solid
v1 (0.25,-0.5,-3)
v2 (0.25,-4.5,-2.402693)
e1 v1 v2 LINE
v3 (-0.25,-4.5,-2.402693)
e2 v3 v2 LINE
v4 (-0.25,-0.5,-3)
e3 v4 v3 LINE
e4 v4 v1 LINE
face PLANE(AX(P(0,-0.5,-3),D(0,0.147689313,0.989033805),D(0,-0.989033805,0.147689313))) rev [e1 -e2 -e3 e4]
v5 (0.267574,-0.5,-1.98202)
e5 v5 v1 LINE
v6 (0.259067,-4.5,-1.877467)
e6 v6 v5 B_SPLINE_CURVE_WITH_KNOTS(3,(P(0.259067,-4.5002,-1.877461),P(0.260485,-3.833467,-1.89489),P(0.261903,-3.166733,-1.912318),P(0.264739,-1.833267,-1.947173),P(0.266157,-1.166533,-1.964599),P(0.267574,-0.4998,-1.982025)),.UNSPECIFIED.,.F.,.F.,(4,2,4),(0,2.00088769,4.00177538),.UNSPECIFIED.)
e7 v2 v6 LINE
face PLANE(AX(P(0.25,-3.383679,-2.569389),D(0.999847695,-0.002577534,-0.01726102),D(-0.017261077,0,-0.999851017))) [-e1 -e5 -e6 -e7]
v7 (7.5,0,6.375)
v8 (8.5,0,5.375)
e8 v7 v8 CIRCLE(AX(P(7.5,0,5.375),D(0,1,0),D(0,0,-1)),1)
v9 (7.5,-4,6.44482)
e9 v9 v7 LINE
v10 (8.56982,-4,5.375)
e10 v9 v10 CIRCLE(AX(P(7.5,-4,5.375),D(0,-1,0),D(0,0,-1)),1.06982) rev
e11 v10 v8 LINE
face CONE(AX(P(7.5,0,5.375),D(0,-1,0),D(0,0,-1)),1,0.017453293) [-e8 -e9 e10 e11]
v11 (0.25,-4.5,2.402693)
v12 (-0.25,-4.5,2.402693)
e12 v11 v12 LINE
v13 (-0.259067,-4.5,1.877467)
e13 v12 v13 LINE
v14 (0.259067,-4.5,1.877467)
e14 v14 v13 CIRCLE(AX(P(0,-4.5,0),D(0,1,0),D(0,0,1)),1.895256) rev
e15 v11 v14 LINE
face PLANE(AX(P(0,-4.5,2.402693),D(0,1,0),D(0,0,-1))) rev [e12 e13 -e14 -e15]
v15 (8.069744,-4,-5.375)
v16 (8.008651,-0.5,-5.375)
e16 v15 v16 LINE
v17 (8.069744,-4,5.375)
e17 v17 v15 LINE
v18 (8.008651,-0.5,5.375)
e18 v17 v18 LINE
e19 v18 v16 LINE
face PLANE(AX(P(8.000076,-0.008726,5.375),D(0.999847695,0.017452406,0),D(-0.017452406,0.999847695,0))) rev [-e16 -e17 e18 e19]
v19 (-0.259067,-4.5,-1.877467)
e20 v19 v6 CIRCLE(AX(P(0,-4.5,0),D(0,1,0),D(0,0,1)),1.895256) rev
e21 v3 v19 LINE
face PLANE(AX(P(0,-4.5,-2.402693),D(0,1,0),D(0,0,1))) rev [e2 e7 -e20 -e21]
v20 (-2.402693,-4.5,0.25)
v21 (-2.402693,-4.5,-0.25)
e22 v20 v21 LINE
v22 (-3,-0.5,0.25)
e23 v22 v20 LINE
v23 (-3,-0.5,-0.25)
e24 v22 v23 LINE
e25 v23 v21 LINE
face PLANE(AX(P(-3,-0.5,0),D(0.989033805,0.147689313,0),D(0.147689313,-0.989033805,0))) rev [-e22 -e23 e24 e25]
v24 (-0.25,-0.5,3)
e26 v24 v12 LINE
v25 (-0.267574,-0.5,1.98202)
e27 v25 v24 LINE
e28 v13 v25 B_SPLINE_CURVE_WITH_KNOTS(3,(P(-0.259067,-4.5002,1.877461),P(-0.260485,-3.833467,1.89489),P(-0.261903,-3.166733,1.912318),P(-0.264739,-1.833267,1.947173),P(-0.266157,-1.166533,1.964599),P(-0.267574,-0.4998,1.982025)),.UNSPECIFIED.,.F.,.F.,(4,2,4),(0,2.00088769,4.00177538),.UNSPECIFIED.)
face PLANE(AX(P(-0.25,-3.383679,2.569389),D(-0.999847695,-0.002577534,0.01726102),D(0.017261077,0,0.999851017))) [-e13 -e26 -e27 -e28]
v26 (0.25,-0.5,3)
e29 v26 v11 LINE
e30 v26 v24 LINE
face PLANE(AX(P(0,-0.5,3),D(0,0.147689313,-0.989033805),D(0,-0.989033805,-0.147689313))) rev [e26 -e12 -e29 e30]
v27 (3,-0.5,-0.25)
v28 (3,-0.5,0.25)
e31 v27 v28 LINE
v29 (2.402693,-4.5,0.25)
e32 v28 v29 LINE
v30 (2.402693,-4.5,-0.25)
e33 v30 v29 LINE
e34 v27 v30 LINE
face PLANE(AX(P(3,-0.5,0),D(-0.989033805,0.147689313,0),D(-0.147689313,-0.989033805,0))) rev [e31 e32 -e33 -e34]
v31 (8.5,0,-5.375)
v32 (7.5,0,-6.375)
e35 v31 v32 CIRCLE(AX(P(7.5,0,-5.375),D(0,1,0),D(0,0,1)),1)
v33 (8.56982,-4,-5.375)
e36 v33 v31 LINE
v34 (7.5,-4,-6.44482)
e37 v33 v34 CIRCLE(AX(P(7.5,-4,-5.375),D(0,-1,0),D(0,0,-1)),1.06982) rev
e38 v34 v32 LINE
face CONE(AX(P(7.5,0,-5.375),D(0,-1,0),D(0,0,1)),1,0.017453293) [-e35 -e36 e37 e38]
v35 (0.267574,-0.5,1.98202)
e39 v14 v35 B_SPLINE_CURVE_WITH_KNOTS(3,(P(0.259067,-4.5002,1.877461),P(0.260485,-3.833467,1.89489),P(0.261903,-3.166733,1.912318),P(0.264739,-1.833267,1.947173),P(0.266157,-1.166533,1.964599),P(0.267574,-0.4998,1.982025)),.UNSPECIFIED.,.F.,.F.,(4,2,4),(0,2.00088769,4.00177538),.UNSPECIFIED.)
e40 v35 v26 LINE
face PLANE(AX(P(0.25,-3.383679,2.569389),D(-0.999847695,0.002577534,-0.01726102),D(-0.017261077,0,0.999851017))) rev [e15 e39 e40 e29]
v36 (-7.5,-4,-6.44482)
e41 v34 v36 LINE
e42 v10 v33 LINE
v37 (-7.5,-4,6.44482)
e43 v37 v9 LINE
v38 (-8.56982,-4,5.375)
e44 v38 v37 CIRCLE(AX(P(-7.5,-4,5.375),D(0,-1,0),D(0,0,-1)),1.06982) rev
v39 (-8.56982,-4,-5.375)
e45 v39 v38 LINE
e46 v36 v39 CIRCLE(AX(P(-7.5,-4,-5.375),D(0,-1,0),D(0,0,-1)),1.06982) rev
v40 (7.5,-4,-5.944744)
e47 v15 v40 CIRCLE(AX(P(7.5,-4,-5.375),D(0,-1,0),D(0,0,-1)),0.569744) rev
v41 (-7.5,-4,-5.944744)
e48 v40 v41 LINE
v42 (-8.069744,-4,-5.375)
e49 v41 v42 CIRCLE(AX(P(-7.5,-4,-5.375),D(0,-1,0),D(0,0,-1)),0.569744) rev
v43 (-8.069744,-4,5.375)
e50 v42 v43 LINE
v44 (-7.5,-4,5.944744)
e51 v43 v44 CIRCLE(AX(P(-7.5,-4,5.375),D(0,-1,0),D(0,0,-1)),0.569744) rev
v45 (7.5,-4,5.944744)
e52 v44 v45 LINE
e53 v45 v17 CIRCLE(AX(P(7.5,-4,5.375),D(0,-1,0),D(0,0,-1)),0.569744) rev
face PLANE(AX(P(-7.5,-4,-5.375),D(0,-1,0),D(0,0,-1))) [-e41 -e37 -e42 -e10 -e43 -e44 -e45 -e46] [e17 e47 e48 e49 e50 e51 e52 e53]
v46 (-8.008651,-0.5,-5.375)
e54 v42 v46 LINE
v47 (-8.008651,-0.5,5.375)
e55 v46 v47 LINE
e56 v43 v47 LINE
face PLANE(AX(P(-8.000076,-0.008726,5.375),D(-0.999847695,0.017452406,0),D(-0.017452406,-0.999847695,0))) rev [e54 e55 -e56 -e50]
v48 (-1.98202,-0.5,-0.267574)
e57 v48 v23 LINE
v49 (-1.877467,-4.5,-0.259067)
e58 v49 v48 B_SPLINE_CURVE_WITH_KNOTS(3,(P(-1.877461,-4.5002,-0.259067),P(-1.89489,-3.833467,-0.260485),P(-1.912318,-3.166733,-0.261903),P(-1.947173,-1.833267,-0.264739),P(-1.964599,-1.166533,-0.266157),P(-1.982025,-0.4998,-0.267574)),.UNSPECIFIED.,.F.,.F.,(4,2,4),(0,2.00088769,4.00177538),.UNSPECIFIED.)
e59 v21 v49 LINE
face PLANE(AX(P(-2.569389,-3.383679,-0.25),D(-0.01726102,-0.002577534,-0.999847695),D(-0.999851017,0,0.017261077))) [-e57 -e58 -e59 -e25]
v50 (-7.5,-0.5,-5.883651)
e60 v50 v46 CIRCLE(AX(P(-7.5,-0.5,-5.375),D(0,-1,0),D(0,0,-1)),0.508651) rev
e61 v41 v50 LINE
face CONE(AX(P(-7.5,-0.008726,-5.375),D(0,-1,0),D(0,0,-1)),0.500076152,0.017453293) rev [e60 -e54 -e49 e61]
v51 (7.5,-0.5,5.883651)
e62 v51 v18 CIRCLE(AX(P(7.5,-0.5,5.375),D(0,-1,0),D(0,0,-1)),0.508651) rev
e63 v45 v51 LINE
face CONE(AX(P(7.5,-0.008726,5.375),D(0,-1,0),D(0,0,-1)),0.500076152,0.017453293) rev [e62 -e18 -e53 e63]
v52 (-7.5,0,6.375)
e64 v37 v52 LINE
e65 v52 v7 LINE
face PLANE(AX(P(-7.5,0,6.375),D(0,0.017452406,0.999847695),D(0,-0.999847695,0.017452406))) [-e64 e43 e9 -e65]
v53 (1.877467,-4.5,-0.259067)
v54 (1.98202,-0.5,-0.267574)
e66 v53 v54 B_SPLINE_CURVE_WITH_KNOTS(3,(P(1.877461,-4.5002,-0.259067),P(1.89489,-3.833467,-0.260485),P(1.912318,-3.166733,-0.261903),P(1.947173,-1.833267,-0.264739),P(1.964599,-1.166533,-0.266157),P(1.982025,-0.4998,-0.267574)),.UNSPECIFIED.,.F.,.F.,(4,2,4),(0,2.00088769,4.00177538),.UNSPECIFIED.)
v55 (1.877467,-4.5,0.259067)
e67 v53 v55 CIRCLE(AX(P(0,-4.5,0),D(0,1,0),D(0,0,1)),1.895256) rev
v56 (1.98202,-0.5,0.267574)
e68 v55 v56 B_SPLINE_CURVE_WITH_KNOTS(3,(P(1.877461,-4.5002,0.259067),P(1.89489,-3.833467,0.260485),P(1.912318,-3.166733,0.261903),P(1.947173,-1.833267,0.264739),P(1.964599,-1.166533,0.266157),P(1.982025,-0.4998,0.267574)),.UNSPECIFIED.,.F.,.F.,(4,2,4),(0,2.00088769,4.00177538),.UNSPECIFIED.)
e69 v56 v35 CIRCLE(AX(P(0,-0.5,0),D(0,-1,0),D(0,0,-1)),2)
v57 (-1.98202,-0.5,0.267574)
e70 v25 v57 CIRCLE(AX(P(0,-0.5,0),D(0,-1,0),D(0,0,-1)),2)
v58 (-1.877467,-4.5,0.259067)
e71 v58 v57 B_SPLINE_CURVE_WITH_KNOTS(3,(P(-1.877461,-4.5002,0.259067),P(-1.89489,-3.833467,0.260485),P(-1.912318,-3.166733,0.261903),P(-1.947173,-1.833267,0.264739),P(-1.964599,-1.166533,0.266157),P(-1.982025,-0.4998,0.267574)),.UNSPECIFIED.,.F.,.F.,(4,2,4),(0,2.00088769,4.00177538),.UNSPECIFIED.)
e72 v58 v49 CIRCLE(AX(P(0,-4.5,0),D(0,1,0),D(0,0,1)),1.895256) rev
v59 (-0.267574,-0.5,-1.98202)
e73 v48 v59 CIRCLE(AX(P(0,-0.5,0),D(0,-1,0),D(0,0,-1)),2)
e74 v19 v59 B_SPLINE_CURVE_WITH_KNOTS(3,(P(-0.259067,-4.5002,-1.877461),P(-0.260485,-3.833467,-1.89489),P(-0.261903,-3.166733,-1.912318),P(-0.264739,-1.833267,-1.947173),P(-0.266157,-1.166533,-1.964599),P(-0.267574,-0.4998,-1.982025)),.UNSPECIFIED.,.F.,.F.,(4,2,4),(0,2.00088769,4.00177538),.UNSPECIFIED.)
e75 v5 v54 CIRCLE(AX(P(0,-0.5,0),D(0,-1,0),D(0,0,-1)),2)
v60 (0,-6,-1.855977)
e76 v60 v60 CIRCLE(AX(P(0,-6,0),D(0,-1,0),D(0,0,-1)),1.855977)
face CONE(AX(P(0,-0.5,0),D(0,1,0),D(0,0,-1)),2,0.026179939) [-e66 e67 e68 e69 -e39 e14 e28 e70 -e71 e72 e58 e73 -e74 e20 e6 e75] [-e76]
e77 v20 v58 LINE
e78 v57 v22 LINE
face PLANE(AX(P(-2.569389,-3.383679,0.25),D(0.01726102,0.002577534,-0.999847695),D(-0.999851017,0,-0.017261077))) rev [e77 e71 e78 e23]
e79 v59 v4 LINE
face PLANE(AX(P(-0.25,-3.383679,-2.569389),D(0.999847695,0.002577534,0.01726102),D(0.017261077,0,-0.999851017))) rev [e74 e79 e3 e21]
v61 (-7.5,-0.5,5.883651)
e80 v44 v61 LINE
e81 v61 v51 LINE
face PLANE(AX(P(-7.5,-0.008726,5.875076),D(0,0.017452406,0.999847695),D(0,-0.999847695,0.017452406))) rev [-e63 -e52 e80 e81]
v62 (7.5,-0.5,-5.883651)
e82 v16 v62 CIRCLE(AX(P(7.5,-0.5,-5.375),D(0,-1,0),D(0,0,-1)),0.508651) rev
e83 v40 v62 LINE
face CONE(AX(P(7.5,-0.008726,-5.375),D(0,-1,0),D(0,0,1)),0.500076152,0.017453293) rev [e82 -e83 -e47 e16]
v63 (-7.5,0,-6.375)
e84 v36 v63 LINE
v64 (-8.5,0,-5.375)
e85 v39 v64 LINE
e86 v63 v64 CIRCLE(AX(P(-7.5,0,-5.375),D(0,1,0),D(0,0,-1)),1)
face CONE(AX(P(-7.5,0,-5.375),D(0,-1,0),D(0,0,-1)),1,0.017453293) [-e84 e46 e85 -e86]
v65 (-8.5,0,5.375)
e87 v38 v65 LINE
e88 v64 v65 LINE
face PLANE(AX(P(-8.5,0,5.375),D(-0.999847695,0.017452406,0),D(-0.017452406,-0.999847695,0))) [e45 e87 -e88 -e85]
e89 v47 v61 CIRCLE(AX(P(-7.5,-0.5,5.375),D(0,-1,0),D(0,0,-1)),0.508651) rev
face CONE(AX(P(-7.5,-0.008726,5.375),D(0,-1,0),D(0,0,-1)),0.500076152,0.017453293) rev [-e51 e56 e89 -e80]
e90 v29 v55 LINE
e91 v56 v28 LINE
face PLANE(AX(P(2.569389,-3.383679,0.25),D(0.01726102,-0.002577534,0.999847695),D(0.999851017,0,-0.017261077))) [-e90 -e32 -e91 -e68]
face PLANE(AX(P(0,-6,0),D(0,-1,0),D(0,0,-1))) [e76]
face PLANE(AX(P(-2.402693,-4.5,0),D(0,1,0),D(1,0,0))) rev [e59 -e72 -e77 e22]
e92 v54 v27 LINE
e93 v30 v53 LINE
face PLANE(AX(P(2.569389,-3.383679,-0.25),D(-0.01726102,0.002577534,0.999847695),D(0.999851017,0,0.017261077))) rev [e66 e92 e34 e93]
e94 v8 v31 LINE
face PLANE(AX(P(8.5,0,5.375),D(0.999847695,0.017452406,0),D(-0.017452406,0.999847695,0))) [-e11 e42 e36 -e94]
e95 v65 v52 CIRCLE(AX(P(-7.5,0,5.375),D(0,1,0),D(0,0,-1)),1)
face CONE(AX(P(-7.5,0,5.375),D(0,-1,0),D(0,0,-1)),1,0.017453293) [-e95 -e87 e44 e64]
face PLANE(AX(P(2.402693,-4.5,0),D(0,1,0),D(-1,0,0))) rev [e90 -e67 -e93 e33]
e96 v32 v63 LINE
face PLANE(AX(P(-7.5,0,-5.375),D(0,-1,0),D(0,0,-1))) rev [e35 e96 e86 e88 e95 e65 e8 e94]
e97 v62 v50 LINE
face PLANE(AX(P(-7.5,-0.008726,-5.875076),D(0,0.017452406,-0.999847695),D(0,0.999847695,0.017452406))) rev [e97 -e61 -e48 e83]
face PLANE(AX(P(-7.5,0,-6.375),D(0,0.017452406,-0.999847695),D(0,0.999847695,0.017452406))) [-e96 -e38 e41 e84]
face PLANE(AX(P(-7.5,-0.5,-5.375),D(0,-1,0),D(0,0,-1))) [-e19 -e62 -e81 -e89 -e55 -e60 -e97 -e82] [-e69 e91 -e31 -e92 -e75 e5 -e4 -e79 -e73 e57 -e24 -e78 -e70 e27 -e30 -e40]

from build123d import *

# Parameters (mm, degrees)
BOSS_EXTRUDE1_DEPTH = 4
BOSS_EXTRUDE1_DRAFT = 1
SHELL1_T            = -0.5
SKETCH2_R           = 2
BOSS_EXTRUDE2_DEPTH = 5.5
BOSS_EXTRUDE2_TAPER = 1.5
CIRPATTERN1_COUNT   = 4


with BuildPart() as part:
    # Sketch1 → Boss-Extrude1 (with draft: the straight prism first)
    with BuildSketch(Plane(origin=(0, 0, 0), x_dir=(1, 0, 0), z_dir=(0, 1, 0))):
        with BuildLine():
            Line((-7.5, -6.375), (7.5, -6.375))
            ThreePointArc((7.5, -6.375), (8.207106781, -6.082106781), (8.5, -5.375))
            Line((8.5, -5.375), (8.5, 5.375))
            ThreePointArc((8.5, 5.375), (8.207106781, 6.082106781), (7.5, 6.375))
            Line((7.5, 6.375), (-7.5, 6.375))
            ThreePointArc((-7.5, 6.375), (-8.207106781, 6.082106781), (-8.5, 5.375))
            Line((-8.5, 5.375), (-8.5, -5.375))
            ThreePointArc((-8.5, -5.375), (-8.207106781, -6.082106781), (-7.5, -6.375))
        make_face()
    extrude(amount=-BOSS_EXTRUDE1_DEPTH)
    # Boss-Extrude1: the draft: its side faces are tilted about the plane it starts from
    boss_extrude1_sides = [part.faces().sort_by_distance(p)[0] for p in [
        (0, -2, 6.375),
        (8.207106781, -2, 6.082106781),
        (8.5, -2, 0),
        (8.207106781, -2, -6.082106781),
        (0, -2, -6.375),
        (-8.207106781, -2, -6.082106781),
        (-8.5, -2, 0),
        (-8.207106781, -2, 6.082106781),
    ]]
    draft(boss_extrude1_sides, Plane(origin=(0, 0, 0), x_dir=(1, 0, 0), z_dir=(0, 1, 0)), BOSS_EXTRUDE1_DRAFT)

    # Shell1
    shell1_openings = [part.faces().sort_by_distance(p)[0] for p in [
        (0, -4, 0),
    ]]
    offset(amount=SHELL1_T, openings=shell1_openings, kind=Kind.INTERSECTION)

    # Sketch2 → Boss-Extrude2 (add)
    with BuildSketch(Plane.XZ.offset(0.5)):
        Circle(SKETCH2_R)
    extrude(amount=BOSS_EXTRUDE2_DEPTH, taper=BOSS_EXTRUDE2_TAPER)

    # Rib1: read off the stored shape, not the designer's step
    # Rib1: loft between two sections, ruled curve by curve
    rib1_from = [
        Edge.make_line((1.982020214, -0.5, 0.267574046), (3, -0.5, 0.25)),
        Edge.make_line((1.982020214, -0.5, -0.267574046), (3, -0.5, -0.25)),
        Edge.make_line((3, -0.5, -0.25), (3, -0.5, 0.25)),
        Edge.make_line((1.982020214, -0.5, -0.267574046), (1.982020214, -0.5, 0.267574046)),
    ]
    rib1_to = [
        Edge.make_line((1.877466543, -4.5, 0.259067318), (2.402692557, -4.5, 0.25)),
        Edge.make_line((1.877466543, -4.5, -0.259067318), (2.402692557, -4.5, -0.25)),
        Edge.make_line((2.402692557, -4.5, -0.25), (2.402692557, -4.5, 0.25)),
        Edge.make_line((1.877466543, -4.5, -0.259067318), (1.877466543, -4.5, 0.259067318)),
    ]
    rib1 = Solid(Shell([*[Face.make_surface_from_curves(rib1_from[k], rib1_to[k]) for k in range(4)], Face(Wire(rib1_from)), Face(Wire(rib1_to))]))
    add(rib1)

    # CirPattern1: Rib1 ×4 about axis
    cirpattern1_axis = Axis((0, 0, 0), (0, 1, 0))
    for i in range(1, CIRPATTERN1_COUNT):
        add(rib1.rotate(cirpattern1_axis, i * 360 / CIRPATTERN1_COUNT))


solid = part.part
